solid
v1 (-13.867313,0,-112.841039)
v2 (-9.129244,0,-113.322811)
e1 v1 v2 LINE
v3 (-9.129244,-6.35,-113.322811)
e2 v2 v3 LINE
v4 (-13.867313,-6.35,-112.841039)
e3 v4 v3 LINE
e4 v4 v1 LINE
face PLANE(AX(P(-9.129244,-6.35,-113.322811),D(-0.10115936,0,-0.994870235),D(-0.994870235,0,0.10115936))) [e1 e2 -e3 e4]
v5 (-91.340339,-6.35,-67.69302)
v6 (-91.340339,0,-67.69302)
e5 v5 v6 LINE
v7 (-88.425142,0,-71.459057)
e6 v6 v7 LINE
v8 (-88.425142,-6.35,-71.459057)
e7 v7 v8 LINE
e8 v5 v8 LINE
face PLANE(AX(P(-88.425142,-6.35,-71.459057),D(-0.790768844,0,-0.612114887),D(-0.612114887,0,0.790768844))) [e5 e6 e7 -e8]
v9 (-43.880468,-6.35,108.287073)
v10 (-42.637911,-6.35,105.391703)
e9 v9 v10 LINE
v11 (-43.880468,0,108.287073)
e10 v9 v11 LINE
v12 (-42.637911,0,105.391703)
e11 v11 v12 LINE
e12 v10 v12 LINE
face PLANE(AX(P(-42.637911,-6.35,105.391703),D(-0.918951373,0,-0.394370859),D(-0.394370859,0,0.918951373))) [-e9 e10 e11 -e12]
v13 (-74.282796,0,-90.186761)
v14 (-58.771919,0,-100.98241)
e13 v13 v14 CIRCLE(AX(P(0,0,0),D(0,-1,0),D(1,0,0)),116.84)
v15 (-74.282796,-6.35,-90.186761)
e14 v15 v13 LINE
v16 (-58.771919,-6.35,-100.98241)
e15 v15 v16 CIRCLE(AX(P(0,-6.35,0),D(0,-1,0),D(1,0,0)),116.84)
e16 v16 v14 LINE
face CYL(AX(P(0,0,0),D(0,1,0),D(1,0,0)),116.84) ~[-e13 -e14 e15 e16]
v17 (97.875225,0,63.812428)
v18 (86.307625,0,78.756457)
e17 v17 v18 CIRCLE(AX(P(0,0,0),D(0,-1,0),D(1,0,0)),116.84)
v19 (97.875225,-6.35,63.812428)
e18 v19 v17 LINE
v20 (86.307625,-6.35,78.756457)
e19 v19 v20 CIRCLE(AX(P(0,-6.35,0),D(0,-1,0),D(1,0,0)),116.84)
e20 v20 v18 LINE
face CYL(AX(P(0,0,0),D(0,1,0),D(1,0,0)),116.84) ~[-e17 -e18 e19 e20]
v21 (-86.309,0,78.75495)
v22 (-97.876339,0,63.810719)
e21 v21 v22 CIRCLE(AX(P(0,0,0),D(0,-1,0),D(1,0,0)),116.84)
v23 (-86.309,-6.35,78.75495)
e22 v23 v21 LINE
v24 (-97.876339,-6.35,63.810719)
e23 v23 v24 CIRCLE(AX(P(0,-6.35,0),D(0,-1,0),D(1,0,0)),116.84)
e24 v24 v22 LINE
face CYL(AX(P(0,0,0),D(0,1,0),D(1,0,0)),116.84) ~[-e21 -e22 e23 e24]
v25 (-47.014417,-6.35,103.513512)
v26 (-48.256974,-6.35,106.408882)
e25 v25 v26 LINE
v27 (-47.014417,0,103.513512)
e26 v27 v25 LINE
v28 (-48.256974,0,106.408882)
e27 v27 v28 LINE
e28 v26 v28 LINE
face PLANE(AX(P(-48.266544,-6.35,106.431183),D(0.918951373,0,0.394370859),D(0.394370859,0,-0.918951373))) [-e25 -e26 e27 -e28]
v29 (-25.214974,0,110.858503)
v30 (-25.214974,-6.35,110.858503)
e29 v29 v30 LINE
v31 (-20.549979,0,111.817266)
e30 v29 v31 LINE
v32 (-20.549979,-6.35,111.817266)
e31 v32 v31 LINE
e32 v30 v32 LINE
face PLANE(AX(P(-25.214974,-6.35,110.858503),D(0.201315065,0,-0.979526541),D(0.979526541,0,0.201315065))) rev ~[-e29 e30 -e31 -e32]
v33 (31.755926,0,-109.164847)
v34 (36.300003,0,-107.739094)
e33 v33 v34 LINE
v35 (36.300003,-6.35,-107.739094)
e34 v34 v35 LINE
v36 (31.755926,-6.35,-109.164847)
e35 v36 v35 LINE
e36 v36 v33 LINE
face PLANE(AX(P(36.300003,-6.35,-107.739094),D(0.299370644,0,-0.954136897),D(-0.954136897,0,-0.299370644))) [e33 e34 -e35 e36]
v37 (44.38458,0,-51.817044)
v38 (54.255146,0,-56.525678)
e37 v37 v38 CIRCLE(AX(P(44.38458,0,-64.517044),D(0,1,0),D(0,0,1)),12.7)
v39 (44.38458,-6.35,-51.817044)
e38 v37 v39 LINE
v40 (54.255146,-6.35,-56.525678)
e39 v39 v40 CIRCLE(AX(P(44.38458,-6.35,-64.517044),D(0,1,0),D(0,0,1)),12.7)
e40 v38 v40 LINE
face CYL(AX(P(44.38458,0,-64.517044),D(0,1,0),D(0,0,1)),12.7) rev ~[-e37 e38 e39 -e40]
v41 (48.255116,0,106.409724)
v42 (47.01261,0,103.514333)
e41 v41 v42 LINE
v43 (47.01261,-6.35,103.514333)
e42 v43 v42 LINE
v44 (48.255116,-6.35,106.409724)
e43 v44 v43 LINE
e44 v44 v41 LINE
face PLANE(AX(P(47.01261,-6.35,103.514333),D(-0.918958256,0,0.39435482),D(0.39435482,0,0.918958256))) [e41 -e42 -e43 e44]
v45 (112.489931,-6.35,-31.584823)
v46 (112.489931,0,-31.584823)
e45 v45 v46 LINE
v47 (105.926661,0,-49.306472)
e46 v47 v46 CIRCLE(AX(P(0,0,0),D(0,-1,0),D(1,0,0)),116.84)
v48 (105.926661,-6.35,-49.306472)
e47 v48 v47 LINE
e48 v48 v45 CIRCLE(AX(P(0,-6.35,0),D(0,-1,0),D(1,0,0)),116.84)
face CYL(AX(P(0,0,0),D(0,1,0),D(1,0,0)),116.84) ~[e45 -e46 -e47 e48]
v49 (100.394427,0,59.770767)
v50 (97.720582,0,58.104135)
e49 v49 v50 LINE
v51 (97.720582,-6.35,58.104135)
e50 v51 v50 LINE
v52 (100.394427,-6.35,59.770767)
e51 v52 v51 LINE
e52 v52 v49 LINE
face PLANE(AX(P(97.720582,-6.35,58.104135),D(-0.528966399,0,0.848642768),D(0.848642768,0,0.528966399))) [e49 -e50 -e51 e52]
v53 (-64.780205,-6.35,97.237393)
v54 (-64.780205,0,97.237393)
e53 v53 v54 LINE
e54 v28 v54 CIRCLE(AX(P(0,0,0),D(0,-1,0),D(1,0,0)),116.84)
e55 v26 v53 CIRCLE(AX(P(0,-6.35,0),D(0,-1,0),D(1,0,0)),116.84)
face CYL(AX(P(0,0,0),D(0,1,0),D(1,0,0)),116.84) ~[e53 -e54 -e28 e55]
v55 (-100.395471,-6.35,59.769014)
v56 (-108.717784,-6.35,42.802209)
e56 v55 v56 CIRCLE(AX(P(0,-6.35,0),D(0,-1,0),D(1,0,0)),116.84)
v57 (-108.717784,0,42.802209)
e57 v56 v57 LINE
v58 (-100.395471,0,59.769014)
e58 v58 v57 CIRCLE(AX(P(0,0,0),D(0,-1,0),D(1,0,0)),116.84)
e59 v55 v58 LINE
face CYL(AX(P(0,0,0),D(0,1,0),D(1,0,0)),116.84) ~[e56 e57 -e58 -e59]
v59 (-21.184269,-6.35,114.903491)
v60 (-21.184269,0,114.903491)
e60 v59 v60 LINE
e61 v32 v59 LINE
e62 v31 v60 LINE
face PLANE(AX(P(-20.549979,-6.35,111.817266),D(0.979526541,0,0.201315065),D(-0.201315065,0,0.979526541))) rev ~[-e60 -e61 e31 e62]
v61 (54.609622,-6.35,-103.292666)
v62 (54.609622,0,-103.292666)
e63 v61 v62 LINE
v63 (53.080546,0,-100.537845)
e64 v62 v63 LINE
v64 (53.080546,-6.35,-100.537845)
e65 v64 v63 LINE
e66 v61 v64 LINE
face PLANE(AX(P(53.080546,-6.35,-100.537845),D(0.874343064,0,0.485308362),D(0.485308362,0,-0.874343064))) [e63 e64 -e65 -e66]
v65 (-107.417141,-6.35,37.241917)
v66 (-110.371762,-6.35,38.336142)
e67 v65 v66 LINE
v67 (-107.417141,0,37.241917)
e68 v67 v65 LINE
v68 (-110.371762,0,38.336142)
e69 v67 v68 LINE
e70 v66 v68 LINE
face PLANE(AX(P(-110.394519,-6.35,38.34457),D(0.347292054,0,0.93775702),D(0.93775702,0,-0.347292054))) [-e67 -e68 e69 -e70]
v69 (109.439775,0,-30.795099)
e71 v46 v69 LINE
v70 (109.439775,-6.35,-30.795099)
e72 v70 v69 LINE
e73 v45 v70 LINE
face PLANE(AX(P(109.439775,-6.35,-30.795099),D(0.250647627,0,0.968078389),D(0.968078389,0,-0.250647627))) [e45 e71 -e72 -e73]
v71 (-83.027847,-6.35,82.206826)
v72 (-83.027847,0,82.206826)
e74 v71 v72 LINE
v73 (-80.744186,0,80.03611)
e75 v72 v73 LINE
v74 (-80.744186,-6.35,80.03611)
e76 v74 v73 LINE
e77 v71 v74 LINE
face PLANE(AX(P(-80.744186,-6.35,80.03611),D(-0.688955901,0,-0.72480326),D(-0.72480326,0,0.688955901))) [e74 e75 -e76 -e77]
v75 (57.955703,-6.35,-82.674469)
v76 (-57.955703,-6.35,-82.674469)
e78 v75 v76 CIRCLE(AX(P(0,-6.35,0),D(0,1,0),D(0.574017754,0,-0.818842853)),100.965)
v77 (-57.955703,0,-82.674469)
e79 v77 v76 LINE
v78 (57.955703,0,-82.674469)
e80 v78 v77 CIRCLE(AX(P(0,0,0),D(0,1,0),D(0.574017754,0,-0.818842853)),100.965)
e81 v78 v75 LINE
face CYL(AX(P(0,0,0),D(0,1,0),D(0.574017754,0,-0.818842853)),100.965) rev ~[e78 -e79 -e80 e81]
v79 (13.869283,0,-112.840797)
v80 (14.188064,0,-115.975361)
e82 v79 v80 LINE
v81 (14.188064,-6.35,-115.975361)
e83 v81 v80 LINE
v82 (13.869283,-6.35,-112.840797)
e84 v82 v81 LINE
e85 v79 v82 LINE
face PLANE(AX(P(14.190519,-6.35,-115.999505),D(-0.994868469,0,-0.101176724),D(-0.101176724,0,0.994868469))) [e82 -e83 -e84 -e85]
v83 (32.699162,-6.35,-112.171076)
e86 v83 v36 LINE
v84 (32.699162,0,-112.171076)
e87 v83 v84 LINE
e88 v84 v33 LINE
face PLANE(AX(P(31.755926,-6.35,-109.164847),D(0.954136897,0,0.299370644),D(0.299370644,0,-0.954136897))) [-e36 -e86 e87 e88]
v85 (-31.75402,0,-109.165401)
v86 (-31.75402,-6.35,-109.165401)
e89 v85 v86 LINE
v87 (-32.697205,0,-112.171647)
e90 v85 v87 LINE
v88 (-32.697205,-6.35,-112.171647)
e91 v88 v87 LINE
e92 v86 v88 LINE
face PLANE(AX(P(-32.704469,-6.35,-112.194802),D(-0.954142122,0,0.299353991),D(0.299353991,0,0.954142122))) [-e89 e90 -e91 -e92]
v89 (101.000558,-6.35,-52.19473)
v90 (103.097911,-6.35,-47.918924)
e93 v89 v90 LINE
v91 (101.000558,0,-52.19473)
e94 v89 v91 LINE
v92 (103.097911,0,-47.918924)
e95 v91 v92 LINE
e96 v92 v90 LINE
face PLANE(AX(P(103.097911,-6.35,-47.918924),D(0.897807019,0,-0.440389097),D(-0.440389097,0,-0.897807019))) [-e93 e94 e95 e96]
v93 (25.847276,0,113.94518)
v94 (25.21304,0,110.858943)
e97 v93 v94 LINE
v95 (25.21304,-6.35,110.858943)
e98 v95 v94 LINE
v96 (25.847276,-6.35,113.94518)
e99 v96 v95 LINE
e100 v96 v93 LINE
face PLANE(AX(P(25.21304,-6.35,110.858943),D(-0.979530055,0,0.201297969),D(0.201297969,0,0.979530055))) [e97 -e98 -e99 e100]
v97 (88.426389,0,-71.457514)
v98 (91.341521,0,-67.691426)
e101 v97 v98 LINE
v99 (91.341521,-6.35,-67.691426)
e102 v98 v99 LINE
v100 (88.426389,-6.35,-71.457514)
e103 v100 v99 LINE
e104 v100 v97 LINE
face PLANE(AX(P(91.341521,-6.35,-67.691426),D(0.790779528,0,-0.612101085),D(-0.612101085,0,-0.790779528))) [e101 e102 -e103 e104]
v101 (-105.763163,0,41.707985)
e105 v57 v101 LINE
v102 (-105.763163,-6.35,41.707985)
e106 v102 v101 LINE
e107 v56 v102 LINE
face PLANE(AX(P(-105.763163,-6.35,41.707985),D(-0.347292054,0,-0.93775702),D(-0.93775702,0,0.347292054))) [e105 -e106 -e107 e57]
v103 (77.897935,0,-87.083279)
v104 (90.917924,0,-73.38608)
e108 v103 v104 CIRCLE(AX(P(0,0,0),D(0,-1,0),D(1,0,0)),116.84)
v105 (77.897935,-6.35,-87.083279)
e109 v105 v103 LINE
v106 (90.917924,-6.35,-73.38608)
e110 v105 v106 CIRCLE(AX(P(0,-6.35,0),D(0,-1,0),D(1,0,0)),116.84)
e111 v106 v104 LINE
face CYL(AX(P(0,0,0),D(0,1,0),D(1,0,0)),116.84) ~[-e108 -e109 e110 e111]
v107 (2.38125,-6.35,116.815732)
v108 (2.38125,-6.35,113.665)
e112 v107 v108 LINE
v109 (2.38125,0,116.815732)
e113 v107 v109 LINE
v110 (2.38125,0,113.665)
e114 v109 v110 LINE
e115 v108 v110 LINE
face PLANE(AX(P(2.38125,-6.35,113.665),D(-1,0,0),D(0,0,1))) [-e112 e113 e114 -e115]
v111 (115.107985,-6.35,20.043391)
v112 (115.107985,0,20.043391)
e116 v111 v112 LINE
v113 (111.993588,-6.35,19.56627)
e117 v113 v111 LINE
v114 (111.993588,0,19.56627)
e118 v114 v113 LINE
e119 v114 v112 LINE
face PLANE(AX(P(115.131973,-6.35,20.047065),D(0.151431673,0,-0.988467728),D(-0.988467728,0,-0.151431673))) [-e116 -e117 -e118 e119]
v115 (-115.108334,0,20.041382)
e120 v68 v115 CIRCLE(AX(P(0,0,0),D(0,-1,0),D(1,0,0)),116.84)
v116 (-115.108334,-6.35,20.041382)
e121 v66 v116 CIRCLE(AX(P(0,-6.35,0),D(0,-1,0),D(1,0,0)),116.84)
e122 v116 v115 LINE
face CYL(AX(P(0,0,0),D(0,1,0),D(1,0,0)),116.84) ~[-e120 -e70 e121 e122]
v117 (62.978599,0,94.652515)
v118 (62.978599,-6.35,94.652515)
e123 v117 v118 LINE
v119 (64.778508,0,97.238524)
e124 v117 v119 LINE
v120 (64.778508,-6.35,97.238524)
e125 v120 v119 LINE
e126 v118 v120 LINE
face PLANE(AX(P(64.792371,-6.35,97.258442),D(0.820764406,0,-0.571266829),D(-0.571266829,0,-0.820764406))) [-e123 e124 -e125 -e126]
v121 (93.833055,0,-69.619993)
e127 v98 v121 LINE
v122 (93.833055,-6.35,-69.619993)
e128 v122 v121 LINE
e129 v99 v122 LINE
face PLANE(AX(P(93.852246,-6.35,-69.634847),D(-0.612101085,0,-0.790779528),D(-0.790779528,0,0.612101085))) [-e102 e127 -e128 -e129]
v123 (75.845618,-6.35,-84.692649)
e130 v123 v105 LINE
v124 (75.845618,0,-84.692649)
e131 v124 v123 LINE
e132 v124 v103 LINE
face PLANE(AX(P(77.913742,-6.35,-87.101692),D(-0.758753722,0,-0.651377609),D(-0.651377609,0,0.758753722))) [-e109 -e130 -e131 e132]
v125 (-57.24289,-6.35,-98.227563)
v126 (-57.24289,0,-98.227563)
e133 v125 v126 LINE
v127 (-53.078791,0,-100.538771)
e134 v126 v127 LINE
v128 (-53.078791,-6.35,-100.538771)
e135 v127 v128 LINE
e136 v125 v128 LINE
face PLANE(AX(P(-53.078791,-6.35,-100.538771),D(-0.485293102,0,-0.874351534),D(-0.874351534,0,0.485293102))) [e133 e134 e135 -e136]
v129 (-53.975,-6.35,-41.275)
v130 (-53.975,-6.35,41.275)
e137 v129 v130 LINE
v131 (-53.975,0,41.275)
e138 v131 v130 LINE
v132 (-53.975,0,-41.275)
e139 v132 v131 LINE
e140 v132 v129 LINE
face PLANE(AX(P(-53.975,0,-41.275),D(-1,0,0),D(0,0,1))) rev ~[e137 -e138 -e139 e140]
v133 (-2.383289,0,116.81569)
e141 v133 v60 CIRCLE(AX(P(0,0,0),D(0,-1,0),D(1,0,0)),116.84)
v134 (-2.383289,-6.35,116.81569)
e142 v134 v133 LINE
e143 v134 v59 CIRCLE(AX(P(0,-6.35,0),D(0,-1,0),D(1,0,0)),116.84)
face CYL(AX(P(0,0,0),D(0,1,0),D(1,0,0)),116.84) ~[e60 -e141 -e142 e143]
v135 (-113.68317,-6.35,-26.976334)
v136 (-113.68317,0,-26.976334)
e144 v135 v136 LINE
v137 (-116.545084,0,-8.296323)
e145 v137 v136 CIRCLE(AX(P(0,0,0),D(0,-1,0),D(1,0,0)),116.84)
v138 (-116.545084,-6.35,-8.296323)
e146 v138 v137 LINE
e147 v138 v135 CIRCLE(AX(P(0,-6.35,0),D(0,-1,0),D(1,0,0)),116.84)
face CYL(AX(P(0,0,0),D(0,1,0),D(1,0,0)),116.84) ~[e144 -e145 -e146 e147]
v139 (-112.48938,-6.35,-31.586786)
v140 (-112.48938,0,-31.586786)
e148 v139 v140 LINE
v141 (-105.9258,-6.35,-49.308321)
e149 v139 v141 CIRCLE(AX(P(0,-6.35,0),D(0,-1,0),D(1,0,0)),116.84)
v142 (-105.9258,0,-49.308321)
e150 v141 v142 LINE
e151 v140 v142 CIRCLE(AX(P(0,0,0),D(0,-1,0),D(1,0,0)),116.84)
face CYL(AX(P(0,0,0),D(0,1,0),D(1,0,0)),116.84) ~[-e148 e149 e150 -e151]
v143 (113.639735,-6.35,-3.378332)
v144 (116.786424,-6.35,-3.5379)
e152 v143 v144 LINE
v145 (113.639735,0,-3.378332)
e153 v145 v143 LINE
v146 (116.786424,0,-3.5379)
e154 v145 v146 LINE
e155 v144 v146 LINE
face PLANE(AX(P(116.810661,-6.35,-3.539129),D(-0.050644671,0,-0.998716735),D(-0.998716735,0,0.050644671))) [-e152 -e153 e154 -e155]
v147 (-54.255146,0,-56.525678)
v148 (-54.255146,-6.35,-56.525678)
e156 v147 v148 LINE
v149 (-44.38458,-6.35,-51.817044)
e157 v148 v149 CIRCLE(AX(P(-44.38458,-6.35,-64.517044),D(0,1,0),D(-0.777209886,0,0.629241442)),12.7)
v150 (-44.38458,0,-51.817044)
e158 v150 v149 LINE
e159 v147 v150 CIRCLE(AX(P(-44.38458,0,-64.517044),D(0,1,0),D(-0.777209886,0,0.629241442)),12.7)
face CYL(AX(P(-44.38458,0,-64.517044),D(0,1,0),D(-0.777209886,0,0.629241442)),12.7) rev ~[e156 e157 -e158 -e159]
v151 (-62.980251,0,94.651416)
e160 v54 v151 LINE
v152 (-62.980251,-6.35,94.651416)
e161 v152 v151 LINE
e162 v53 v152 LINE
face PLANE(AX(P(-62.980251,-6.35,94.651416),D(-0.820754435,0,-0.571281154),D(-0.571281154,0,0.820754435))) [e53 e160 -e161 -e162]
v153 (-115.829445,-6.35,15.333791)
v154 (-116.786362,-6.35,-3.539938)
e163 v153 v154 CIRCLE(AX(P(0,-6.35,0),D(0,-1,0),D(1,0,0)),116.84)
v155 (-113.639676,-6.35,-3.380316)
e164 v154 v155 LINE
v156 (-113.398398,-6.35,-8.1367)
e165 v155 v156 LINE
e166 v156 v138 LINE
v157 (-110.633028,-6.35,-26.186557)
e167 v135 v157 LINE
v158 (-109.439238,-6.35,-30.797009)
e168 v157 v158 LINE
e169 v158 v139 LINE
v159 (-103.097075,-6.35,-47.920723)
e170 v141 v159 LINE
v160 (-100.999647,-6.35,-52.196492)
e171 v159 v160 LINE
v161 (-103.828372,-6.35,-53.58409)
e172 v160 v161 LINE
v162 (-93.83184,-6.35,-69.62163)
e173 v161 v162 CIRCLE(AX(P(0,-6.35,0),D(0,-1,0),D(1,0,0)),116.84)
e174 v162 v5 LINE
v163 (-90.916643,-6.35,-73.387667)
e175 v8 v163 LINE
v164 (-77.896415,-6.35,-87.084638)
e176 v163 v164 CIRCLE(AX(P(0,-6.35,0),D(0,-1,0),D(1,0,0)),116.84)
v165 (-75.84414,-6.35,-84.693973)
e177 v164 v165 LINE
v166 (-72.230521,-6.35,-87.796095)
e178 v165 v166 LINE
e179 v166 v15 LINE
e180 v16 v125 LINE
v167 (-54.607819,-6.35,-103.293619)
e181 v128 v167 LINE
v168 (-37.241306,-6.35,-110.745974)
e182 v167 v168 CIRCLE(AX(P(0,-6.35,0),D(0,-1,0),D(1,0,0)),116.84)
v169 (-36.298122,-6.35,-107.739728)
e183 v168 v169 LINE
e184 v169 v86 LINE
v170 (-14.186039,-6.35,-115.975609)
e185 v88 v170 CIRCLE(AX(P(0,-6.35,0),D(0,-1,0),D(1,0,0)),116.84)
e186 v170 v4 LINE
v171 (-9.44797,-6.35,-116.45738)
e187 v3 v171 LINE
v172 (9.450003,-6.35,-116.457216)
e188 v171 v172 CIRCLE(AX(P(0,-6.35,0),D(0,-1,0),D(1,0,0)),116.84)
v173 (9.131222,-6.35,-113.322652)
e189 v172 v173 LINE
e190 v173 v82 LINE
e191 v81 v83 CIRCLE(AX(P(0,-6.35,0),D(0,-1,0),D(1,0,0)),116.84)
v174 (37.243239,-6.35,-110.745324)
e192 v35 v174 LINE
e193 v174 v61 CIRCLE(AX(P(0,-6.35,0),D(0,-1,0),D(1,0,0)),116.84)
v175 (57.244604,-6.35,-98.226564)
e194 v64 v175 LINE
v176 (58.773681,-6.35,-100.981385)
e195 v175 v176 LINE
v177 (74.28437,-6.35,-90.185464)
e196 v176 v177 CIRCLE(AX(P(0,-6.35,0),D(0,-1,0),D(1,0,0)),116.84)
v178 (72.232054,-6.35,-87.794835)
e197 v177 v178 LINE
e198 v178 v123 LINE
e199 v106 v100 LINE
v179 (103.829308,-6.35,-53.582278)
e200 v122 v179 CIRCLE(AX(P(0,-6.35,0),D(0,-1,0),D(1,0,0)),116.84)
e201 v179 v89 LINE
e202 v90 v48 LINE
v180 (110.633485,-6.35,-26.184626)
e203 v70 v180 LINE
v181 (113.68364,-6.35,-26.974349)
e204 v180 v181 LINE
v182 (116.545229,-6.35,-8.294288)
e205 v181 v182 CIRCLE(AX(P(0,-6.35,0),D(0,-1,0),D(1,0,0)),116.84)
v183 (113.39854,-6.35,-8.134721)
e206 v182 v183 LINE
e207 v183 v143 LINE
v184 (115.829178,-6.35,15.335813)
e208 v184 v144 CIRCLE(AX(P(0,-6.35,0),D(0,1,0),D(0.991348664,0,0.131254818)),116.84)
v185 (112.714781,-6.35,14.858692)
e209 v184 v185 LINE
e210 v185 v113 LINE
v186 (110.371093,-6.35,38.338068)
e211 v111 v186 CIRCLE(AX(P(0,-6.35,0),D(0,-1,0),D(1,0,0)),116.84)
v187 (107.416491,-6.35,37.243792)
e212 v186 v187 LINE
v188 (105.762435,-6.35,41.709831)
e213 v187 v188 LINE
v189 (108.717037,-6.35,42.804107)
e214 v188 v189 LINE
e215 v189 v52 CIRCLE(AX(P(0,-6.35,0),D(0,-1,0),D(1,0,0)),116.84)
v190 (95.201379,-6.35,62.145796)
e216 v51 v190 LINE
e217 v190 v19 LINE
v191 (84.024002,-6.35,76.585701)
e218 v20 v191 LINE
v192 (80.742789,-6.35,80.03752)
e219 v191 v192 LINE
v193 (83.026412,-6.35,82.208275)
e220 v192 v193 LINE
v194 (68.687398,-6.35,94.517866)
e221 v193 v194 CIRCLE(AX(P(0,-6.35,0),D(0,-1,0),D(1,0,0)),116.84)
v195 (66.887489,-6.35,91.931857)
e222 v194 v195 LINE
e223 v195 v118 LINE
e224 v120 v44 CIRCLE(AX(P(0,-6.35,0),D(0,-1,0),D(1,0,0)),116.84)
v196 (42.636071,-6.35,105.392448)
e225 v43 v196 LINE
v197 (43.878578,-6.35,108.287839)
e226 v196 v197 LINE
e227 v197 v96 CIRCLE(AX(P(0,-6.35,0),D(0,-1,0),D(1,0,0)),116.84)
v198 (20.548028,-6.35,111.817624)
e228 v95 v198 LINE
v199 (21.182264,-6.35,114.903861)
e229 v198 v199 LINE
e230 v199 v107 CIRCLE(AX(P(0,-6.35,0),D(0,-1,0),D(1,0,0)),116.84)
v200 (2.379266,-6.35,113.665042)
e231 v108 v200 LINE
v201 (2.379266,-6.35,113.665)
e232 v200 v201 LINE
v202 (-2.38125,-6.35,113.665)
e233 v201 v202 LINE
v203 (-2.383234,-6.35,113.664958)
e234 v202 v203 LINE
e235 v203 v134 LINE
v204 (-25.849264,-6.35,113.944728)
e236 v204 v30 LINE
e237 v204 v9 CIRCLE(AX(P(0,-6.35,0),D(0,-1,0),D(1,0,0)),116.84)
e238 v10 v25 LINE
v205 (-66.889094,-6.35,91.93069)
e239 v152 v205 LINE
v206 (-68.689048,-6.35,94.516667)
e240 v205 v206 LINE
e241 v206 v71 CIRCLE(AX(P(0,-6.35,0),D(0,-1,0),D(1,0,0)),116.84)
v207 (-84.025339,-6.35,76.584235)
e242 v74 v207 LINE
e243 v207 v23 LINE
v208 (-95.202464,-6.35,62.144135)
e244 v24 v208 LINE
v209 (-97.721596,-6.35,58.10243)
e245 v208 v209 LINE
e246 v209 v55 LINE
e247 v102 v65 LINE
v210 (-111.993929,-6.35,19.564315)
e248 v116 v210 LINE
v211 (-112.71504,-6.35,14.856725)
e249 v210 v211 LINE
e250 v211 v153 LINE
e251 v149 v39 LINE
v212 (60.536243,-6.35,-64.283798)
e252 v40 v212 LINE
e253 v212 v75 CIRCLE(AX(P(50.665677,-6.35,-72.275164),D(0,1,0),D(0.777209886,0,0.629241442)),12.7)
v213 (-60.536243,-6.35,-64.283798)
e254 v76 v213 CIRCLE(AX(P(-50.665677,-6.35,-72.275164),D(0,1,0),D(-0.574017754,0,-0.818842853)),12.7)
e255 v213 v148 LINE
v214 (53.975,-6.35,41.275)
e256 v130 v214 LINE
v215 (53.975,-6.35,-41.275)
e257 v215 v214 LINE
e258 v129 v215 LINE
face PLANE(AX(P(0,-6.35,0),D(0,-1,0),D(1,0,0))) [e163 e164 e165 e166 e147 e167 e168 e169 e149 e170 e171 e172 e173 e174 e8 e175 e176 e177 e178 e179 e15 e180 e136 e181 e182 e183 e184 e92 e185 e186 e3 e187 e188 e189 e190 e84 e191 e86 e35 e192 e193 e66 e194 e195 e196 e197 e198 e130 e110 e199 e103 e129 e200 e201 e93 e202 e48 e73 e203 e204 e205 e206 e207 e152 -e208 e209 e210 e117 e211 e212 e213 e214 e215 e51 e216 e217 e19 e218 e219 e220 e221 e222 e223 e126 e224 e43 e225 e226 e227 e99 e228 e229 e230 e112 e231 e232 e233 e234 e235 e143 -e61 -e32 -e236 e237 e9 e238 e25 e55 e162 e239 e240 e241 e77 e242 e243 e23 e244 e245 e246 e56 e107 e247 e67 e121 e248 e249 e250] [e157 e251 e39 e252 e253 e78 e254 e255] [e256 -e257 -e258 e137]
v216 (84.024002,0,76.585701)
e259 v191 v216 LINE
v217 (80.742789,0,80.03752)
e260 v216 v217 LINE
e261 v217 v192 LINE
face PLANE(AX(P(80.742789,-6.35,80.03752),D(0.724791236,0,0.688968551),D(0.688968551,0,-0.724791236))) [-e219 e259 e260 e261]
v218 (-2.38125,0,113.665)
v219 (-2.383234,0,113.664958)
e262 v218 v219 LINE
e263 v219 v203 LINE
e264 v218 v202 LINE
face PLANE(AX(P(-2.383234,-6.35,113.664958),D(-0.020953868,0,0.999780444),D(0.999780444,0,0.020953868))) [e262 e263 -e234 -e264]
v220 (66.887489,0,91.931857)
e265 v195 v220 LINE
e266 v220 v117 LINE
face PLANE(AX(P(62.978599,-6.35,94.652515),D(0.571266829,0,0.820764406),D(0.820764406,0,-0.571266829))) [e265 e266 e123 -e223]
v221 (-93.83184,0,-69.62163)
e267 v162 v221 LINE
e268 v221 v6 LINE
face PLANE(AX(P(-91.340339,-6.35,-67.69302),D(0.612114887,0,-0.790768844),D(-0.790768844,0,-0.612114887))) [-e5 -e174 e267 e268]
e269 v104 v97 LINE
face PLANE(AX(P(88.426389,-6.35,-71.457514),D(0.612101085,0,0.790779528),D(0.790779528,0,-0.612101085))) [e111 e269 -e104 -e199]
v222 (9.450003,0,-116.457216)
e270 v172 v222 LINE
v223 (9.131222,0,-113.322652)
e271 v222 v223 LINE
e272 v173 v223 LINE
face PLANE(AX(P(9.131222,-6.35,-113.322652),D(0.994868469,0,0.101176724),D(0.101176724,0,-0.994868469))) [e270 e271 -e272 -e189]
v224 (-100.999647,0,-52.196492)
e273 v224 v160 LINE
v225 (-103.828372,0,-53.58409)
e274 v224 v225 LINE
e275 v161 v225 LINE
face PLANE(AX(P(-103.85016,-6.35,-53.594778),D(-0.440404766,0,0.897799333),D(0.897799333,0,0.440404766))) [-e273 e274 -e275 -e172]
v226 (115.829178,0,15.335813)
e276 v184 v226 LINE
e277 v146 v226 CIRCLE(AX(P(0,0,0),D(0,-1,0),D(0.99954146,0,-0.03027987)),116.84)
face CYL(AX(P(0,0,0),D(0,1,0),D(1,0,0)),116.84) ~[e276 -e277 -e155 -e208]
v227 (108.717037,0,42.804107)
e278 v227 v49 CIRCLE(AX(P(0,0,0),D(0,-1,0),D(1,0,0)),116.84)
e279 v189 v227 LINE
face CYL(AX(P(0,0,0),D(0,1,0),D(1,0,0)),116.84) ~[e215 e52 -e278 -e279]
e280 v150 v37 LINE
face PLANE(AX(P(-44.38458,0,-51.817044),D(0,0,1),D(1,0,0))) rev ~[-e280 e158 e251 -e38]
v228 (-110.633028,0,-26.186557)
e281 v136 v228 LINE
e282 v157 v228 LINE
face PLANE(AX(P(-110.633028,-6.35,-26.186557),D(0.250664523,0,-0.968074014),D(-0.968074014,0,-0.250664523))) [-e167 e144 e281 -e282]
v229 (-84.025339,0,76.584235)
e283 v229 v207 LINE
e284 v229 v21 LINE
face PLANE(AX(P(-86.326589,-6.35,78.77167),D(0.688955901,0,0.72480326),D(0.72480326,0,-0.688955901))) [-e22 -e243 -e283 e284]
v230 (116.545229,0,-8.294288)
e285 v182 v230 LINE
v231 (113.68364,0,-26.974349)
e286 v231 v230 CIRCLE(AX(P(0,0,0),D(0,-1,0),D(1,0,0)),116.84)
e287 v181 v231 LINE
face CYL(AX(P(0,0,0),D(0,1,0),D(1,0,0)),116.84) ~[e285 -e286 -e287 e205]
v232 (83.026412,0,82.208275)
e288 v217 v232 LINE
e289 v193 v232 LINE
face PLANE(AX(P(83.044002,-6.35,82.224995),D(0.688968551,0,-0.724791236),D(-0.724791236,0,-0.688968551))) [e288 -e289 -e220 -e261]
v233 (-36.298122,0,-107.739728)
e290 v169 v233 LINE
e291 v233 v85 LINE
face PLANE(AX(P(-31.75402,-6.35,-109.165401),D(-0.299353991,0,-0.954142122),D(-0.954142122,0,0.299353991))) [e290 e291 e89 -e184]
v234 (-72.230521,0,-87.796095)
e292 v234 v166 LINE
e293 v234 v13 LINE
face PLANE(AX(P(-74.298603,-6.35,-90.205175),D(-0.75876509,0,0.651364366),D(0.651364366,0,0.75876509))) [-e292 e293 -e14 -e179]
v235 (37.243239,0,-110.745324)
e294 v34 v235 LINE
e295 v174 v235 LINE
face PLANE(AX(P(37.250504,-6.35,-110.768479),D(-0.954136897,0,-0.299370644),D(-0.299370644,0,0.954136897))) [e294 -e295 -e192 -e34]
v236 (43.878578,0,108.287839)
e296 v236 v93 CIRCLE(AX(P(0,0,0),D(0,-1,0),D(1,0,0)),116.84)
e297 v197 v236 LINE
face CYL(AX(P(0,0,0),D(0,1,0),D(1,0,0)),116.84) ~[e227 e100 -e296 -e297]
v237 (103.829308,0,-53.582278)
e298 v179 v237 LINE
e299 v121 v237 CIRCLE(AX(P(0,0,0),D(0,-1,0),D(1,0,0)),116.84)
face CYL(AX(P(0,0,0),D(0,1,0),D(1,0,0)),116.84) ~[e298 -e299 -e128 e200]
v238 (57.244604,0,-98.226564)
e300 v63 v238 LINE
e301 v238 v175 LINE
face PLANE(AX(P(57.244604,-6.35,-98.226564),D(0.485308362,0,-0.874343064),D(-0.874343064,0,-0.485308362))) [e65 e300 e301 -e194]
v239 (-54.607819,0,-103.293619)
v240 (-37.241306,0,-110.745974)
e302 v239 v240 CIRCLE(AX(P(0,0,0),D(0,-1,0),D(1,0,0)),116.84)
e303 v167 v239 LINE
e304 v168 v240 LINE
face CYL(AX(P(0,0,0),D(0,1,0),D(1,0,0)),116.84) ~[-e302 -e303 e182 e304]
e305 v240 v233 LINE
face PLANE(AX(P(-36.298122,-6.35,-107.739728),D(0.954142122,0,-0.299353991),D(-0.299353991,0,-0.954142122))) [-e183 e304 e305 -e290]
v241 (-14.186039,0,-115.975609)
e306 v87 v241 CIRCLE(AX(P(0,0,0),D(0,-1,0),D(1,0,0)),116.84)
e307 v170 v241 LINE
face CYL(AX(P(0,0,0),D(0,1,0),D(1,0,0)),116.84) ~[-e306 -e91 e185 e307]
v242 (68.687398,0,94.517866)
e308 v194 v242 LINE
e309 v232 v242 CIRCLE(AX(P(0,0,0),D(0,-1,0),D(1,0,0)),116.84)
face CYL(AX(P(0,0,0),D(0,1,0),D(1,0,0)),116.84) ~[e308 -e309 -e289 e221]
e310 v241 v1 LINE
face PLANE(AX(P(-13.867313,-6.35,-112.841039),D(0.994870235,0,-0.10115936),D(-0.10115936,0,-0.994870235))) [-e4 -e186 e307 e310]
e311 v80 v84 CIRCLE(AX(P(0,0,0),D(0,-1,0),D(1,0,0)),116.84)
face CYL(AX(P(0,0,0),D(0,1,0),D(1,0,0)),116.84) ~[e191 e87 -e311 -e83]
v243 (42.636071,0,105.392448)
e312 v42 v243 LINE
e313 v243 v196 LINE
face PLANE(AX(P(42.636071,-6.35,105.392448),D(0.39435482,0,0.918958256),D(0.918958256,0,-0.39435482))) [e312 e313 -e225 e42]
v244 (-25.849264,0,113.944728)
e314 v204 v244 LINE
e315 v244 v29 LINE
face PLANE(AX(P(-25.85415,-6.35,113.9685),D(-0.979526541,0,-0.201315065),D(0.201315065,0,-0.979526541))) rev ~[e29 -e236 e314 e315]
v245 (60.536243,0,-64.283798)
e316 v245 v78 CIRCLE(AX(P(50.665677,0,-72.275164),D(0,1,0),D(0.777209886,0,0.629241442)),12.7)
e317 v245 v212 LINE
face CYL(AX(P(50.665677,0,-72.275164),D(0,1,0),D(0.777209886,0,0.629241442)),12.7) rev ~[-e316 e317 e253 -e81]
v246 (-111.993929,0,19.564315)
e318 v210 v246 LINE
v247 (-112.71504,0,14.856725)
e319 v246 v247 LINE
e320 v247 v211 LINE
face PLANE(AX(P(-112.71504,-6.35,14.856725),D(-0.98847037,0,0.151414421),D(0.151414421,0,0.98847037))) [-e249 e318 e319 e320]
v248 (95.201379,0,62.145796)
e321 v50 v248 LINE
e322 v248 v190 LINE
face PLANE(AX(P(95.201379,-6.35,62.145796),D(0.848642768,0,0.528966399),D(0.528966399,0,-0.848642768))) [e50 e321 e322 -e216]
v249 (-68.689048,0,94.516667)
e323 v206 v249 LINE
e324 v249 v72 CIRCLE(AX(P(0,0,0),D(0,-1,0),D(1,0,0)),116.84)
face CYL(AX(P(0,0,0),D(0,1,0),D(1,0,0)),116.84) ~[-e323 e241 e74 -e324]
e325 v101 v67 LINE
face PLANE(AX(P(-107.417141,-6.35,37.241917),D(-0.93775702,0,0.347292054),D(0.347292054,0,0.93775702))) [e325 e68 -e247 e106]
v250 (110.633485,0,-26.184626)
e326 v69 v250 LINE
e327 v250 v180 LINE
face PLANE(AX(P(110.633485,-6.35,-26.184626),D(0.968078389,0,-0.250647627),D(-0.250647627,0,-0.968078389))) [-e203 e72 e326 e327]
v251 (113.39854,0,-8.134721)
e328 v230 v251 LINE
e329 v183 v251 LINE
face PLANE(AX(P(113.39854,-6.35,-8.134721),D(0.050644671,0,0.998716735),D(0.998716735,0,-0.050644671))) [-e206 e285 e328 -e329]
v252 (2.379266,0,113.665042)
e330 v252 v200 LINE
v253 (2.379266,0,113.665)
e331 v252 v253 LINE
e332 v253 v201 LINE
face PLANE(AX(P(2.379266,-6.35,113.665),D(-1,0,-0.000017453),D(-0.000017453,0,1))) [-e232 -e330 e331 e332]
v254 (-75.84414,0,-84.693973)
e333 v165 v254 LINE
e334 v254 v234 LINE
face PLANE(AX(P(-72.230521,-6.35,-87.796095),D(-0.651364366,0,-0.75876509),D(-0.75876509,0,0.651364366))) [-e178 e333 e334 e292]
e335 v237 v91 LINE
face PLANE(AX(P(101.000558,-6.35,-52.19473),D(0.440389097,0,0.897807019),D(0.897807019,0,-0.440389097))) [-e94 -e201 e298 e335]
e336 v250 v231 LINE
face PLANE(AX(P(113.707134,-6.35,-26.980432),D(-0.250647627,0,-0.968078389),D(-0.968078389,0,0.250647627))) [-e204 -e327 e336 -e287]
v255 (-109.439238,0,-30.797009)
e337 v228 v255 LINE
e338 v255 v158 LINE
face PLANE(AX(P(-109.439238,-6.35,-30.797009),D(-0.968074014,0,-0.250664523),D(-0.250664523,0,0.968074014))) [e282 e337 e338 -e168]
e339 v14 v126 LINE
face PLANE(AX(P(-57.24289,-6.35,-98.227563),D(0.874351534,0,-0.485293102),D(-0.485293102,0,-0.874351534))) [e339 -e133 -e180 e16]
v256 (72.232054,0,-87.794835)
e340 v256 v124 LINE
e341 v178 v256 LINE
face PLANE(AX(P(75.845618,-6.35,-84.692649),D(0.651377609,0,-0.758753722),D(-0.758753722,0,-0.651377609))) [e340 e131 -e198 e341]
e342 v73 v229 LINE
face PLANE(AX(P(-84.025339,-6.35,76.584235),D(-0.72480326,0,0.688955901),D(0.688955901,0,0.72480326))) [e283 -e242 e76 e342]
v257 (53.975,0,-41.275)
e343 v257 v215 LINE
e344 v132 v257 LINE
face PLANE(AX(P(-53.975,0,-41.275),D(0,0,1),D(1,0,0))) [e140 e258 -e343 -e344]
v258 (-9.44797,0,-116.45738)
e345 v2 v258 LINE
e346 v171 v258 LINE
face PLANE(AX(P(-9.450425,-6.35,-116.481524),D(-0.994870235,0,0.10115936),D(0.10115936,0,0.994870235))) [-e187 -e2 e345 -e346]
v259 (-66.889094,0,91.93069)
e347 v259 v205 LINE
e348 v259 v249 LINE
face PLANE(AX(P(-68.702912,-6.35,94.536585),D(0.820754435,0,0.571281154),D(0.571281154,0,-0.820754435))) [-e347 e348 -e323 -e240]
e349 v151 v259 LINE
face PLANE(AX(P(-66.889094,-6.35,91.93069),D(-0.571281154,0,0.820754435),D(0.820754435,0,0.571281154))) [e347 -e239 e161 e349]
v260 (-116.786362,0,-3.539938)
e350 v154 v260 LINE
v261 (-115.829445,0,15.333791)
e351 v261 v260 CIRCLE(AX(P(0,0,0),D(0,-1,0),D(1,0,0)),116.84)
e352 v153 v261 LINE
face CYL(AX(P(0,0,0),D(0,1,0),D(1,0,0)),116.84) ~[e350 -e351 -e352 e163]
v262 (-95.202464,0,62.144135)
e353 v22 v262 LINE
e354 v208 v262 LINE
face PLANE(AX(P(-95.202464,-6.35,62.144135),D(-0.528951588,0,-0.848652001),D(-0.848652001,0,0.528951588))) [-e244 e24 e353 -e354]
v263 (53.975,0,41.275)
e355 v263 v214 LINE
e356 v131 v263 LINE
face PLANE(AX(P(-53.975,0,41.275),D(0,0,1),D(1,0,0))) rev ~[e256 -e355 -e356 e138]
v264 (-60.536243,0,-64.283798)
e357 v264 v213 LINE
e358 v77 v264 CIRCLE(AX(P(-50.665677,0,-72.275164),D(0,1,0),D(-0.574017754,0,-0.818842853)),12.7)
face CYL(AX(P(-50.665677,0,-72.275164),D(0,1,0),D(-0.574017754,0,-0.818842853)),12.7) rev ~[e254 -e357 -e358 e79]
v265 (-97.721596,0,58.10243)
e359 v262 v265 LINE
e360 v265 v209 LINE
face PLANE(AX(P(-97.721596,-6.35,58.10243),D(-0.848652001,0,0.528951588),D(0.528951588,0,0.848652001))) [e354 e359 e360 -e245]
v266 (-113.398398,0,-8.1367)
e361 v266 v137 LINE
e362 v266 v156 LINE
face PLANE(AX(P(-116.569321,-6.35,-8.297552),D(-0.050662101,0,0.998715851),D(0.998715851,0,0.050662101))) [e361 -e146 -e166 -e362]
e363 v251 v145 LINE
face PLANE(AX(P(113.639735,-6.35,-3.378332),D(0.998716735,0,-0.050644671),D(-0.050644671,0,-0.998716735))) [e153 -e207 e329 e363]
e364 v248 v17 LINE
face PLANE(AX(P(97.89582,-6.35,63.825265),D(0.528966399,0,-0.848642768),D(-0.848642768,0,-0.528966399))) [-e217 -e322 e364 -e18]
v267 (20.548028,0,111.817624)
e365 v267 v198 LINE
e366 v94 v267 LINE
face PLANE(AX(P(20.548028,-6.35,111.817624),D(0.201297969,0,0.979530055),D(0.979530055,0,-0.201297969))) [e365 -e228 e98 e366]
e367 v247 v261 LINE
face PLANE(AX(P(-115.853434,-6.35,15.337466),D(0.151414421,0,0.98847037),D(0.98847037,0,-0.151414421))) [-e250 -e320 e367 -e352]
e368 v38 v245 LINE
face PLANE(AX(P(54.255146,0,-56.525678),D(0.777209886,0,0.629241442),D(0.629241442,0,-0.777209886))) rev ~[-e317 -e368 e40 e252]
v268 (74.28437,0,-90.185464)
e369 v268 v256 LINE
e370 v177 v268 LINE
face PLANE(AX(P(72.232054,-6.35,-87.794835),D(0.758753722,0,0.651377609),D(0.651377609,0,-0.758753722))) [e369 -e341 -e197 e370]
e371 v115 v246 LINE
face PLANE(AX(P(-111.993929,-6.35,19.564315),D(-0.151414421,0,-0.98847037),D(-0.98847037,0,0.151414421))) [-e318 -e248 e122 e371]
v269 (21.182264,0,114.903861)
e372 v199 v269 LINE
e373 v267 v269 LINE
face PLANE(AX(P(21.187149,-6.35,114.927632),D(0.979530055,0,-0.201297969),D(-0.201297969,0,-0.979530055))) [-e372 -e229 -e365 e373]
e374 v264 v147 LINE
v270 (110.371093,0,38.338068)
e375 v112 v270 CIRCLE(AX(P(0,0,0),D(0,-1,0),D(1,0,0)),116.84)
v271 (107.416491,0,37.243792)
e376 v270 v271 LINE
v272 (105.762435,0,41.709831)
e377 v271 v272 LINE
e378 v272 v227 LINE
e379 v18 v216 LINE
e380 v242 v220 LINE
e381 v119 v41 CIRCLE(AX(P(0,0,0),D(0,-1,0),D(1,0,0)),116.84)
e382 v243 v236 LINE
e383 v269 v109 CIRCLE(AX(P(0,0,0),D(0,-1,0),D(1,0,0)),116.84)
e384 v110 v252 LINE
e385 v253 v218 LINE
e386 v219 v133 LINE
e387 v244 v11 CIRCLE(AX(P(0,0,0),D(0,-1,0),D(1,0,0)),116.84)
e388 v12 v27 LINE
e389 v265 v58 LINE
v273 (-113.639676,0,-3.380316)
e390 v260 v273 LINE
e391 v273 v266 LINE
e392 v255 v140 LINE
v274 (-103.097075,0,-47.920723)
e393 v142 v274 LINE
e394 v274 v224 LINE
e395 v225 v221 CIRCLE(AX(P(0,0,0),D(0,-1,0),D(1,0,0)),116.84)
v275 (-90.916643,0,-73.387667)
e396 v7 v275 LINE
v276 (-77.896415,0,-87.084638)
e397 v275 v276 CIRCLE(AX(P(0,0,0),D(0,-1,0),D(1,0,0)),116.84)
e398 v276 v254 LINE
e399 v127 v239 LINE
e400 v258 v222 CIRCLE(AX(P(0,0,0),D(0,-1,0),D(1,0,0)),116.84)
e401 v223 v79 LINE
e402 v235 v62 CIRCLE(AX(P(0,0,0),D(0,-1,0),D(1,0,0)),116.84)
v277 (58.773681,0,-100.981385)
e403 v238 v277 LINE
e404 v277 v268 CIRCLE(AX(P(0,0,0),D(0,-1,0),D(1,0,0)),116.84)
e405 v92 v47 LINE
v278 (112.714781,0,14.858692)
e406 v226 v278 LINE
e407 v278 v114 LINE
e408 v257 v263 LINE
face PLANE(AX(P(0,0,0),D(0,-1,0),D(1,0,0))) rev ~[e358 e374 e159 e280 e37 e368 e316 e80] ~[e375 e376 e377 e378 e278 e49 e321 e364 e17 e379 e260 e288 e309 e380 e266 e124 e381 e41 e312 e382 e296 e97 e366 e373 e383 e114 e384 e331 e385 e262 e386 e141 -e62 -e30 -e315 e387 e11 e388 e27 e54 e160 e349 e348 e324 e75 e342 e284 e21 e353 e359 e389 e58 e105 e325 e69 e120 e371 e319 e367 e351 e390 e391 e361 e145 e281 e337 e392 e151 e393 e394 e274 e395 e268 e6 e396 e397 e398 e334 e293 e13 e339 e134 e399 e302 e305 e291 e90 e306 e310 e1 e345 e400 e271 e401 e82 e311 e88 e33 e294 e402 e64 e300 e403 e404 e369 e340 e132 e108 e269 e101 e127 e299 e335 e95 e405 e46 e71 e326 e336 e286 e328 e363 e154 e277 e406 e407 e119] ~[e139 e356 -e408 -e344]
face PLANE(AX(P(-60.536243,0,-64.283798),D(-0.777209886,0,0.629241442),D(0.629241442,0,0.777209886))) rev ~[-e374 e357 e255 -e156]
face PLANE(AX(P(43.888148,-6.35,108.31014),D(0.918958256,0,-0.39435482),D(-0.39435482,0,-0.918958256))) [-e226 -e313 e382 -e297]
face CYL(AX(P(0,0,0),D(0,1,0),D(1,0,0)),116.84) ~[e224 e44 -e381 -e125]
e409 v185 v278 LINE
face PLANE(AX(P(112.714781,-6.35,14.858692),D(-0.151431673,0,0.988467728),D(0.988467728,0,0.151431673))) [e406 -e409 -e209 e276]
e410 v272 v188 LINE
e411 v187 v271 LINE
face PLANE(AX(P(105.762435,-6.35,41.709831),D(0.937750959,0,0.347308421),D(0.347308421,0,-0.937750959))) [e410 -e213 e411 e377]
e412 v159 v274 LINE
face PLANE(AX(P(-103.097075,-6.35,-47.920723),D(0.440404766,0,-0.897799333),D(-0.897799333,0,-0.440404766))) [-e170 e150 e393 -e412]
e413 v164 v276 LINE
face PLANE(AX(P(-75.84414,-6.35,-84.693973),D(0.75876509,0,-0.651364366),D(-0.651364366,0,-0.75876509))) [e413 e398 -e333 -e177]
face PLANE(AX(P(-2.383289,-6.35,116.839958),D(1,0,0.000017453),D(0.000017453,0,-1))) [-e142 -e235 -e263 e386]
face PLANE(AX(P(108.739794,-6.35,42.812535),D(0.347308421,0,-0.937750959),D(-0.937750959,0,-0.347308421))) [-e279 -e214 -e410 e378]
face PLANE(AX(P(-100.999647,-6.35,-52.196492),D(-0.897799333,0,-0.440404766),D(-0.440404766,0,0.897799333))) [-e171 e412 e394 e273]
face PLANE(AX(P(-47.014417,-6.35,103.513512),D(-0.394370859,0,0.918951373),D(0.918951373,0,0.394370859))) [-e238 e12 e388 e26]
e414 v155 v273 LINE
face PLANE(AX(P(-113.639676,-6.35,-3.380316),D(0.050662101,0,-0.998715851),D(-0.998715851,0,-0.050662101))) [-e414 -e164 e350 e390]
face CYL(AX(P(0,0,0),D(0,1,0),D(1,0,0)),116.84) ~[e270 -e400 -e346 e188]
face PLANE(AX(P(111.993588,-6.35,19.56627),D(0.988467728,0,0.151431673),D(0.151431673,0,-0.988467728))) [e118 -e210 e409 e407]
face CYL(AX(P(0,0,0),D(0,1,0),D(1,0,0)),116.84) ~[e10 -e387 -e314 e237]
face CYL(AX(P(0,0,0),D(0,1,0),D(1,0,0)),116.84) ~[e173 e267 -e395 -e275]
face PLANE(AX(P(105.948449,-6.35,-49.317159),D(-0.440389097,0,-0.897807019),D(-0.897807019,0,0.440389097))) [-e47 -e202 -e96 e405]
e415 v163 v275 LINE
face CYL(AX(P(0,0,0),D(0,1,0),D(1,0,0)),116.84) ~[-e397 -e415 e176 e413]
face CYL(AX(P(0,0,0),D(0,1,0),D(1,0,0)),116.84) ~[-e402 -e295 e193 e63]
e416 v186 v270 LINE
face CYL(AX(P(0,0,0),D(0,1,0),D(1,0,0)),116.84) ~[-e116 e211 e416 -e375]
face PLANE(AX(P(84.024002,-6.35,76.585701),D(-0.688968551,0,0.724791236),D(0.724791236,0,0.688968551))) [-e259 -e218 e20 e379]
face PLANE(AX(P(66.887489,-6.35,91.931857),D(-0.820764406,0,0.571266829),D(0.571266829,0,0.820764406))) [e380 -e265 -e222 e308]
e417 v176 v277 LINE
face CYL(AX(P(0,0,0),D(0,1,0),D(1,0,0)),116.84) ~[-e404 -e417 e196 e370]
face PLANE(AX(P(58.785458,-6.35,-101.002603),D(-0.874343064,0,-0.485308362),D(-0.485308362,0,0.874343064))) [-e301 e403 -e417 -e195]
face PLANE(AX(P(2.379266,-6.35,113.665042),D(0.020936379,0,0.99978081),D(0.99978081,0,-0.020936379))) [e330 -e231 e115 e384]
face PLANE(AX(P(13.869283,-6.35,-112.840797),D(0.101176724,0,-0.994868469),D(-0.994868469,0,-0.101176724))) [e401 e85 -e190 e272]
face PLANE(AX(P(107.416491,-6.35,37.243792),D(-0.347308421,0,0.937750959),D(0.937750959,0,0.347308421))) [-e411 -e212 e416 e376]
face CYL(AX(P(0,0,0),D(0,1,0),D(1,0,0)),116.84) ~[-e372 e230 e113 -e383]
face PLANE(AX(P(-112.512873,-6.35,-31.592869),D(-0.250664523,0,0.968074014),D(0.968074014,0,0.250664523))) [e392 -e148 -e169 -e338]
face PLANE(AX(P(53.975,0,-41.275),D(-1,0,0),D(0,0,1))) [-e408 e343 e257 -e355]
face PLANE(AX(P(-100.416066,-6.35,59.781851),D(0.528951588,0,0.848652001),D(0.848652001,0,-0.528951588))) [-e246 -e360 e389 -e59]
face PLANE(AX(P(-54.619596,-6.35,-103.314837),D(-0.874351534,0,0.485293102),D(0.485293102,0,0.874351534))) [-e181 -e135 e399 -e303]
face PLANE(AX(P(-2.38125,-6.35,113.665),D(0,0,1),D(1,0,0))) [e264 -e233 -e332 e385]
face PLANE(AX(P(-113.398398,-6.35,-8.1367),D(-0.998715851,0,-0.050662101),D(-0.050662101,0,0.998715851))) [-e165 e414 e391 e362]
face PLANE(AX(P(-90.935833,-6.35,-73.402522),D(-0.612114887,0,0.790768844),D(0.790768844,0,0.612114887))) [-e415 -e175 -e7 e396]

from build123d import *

# Parameters (mm, degrees)
F0_R     = 116.84
F0_W     = 107.95
F0_H     = 82.55
F1_DEPTH = 6.35
F3_DEPTH = 12.7


# Not quite as in the source:
# - ends of sketch curves that miss each other by under 0.0002 mm in the source are joined


with BuildPart() as f1:
    # F0 (on Front) → F1 (new body)
    with BuildSketch(Plane.XZ):
        Circle(F0_R)
        with BuildLine():
            ThreePointArc((57.9557025683, -82.6744686394), (0, -100.965), (-57.9557025683, -82.6744686394))
            ThreePointArc((-57.9557025683, -82.6744686394), (-63.2424676953, -74.0399131217), (-60.5362426444, -64.283798092))
            Line((-60.5362426444, -64.283798092), (-54.2551455528, -56.5256778711))
            ThreePointArc((-54.2551455528, -56.5256778711), (-49.8526531391, -53.0544887955), (-44.3845799964, -51.8170441872))
            Line((-44.3845799964, -51.8170441872), (44.3845799964, -51.8170441872))
            ThreePointArc((44.3845799964, -51.8170441872), (49.8526531391, -53.0544887955), (54.2551455528, -56.5256778711))
            Line((54.2551455528, -56.5256778711), (60.5362426444, -64.283798092))
            ThreePointArc((60.5362426444, -64.283798092), (63.2424676953, -74.0399131217), (57.9557025683, -82.6744686394))
        make_face(mode=Mode.SUBTRACT)
        Rectangle(F0_W, F0_H, mode=Mode.SUBTRACT)
    extrude(amount=F1_DEPTH)

    # F2 (on face) → F3 (cut, symmetric)
    with BuildSketch(Plane.XZ.offset(6.35)):
        Polygon((2.3792107569, 116.84), (-2.38125, 116.84), (-2.38125, 113.665), (2.3792661711, 113.665), align=None)
        Polygon((-2.38125, 113.665), (-2.38125, 116.84), (-2.3832892423, 116.8399584216), (-2.3832338281, 113.664958422), align=None)
        Polygon((2.38125, 116.84), (2.3792107569, 116.84), (2.3792661711, 113.6650415433), (2.38125, 113.665), align=None)
        Polygon((25.8521605942, 113.96895079), (21.1871487092, 114.9276323655), (20.5480276589, 111.8176244422), (25.2130395439, 110.8589428667), align=None)
        Polygon((48.2646865559, 106.4320251767), (43.8881478633, 108.3101400086), (42.6360713087, 105.3924475469), (47.0126100013, 103.514332715), align=None)
        Polygon((68.7012615192, 94.537784072), (64.7923710351, 97.2584423441), (62.9785988537, 94.6525153548), (66.8874893377, 91.9318570826), align=None)
        Polygon((86.3252143359, 78.7731764081), (83.0440016102, 82.2249946678), (80.742789437, 80.0375195173), (84.0240021628, 76.5857012576), align=None)
        Polygon((100.415022302, 59.7836035017), (97.8958198253, 63.8252646864), (95.2013790356, 62.1457963686), (97.7205815122, 58.1041351839), align=None)
        Polygon((110.3938502174, 38.3464963946), (108.7397938642, 42.8125353365), (105.7624345696, 41.709831101), (107.4164909228, 37.2437921591), align=None)
        Polygon((115.8531659566, 15.3394879114), (115.1319726134, 20.0470654638), (111.9935875785, 19.5662699016), (112.7147809217, 14.8586923493), align=None)
        Polygon((116.5694657294, -8.2955175322), (116.8106609728, -3.5391290804), (113.6397353383, -3.3783322514), (113.3985400948, -8.1347207032), align=None)
        Polygon((112.5134243011, -31.5909053937), (113.7071336244, -26.9804320664), (110.6334847395, -26.184625851), (109.4397754163, -30.7950991782), align=None)
        Polygon((103.8510955651, -53.5929650372), (105.9484486388, -49.3171591092), (103.0979113534, -47.9189237267), (101.0005582798, -52.1947296548), align=None)
        Polygon((90.9371143142, -73.4009345429), (93.8522457324, -69.6348470419), (91.3415207317, -67.6914260965), (88.4263893136, -71.4575135974), align=None)
        Polygon((74.3001775309, -90.2038778015), (77.9137421316, -87.1016919389), (75.8456182231, -84.6926488717), (72.2320536224, -87.7948347344), align=None)
        Polygon((54.6213995909, -103.3138841506), (58.7854584338, -101.0026030768), (57.2446043846, -98.2265638481), (53.0805455416, -100.537844922), align=None)
        Polygon((32.7064275147, -112.1942313615), (37.2505044854, -110.7684786712), (36.300002692, -107.7390940241), (31.7559257212, -109.1648467143), align=None)
        Polygon((9.4524578666, -116.4813589886), (14.1905189501, -115.9995048416), (13.869282852, -112.8407974526), (9.1312217685, -113.3226515996), align=None)
        Polygon((-14.1884943746, -115.9997524952), (-9.4504248819, -116.4815239474), (-9.1292439138, -113.3228109523), (-13.8673134065, -112.8410395), align=None)
        Polygon((-37.2485712051, -110.7691287983), (-32.704469351, -112.1948021792), (-31.7540204304, -109.1654009431), (-36.2981222845, -107.7397275622), align=None)
        Polygon((-58.7836955969, -101.0036290612), (-54.6195964151, -103.3148374582), (-53.0787908171, -100.538771337), (-57.2428899989, -98.22756294), align=None)
        Polygon((-77.9122219084, -87.1030517769), (-74.2986031649, -90.2051745705), (-72.2305213025, -87.7960954082), (-75.844140046, -84.6939726146), align=None)
        Polygon((-93.8510303607, -69.636485062), (-90.9358332124, -73.4025216837), (-88.4251421312, -71.4590569182), (-91.3403392796, -67.6930202964), align=None)
        Polygon((-105.9475878758, -49.3190082509), (-103.8501601756, -53.5947775726), (-100.9996472945, -52.1964924391), (-103.0970749947, -47.9207231174), align=None)
        Polygon((-113.7066627097, -26.9824166262), (-112.5128729187, -31.5928691186), (-109.4392379237, -30.797009258), (-110.6330277147, -26.1865567655), align=None)
        Polygon((-116.8105991856, -3.5411678105), (-116.5693209275, -8.2975520519), (-113.3983980999, -8.1366998799), (-113.639676358, -3.3803156385), align=None)
        Polygon((-115.1323224832, 20.0450560288), (-115.8534336636, 15.3374658899), (-112.7150402377, 14.856725103), (-111.9939290573, 19.5643152418), align=None)
        Polygon((-108.7405410673, 42.8106374625), (-110.3945194732, 38.3445696526), (-107.4171409332, 37.241917382), (-105.7631625274, 41.707985192), align=None)
        Polygon((-97.8969337715, 63.8235560723), (-100.4160657074, 59.7818509198), (-97.7215956058, 58.1024296292), (-95.2024636698, 62.1441347816), align=None)
        Polygon((-83.0454366945, 82.2235452641), (-86.3265891741, 78.7716697368), (-84.0253388226, 76.5842347504), (-80.744186343, 80.0361102776), align=None)
        Polygon((-64.7940685053, 97.2573114891), (-68.7029115043, 94.5365849944), (-66.8890938411, 91.9306896617), (-62.9802508421, 94.6514161565), align=None)
        Polygon((-43.8900382252, 108.3093739995), (-48.2665441378, 106.4311827828), (-47.0144166601, 103.5135121744), (-42.6379107474, 105.391703391), align=None)
        Polygon((-21.1891545716, 114.9272625625), (-25.8541497237, 113.9684995673), (-25.2149743936, 110.8585027993), (-20.5499792415, 111.8172657944), align=None)
    extrude(amount=F3_DEPTH, both=True, mode=Mode.SUBTRACT)


with BuildPart() as f4_1:
    # F4: copy of F1
    add(f1.part.moved(Location((0, 87.3125, 0))))


solid = f1.part
